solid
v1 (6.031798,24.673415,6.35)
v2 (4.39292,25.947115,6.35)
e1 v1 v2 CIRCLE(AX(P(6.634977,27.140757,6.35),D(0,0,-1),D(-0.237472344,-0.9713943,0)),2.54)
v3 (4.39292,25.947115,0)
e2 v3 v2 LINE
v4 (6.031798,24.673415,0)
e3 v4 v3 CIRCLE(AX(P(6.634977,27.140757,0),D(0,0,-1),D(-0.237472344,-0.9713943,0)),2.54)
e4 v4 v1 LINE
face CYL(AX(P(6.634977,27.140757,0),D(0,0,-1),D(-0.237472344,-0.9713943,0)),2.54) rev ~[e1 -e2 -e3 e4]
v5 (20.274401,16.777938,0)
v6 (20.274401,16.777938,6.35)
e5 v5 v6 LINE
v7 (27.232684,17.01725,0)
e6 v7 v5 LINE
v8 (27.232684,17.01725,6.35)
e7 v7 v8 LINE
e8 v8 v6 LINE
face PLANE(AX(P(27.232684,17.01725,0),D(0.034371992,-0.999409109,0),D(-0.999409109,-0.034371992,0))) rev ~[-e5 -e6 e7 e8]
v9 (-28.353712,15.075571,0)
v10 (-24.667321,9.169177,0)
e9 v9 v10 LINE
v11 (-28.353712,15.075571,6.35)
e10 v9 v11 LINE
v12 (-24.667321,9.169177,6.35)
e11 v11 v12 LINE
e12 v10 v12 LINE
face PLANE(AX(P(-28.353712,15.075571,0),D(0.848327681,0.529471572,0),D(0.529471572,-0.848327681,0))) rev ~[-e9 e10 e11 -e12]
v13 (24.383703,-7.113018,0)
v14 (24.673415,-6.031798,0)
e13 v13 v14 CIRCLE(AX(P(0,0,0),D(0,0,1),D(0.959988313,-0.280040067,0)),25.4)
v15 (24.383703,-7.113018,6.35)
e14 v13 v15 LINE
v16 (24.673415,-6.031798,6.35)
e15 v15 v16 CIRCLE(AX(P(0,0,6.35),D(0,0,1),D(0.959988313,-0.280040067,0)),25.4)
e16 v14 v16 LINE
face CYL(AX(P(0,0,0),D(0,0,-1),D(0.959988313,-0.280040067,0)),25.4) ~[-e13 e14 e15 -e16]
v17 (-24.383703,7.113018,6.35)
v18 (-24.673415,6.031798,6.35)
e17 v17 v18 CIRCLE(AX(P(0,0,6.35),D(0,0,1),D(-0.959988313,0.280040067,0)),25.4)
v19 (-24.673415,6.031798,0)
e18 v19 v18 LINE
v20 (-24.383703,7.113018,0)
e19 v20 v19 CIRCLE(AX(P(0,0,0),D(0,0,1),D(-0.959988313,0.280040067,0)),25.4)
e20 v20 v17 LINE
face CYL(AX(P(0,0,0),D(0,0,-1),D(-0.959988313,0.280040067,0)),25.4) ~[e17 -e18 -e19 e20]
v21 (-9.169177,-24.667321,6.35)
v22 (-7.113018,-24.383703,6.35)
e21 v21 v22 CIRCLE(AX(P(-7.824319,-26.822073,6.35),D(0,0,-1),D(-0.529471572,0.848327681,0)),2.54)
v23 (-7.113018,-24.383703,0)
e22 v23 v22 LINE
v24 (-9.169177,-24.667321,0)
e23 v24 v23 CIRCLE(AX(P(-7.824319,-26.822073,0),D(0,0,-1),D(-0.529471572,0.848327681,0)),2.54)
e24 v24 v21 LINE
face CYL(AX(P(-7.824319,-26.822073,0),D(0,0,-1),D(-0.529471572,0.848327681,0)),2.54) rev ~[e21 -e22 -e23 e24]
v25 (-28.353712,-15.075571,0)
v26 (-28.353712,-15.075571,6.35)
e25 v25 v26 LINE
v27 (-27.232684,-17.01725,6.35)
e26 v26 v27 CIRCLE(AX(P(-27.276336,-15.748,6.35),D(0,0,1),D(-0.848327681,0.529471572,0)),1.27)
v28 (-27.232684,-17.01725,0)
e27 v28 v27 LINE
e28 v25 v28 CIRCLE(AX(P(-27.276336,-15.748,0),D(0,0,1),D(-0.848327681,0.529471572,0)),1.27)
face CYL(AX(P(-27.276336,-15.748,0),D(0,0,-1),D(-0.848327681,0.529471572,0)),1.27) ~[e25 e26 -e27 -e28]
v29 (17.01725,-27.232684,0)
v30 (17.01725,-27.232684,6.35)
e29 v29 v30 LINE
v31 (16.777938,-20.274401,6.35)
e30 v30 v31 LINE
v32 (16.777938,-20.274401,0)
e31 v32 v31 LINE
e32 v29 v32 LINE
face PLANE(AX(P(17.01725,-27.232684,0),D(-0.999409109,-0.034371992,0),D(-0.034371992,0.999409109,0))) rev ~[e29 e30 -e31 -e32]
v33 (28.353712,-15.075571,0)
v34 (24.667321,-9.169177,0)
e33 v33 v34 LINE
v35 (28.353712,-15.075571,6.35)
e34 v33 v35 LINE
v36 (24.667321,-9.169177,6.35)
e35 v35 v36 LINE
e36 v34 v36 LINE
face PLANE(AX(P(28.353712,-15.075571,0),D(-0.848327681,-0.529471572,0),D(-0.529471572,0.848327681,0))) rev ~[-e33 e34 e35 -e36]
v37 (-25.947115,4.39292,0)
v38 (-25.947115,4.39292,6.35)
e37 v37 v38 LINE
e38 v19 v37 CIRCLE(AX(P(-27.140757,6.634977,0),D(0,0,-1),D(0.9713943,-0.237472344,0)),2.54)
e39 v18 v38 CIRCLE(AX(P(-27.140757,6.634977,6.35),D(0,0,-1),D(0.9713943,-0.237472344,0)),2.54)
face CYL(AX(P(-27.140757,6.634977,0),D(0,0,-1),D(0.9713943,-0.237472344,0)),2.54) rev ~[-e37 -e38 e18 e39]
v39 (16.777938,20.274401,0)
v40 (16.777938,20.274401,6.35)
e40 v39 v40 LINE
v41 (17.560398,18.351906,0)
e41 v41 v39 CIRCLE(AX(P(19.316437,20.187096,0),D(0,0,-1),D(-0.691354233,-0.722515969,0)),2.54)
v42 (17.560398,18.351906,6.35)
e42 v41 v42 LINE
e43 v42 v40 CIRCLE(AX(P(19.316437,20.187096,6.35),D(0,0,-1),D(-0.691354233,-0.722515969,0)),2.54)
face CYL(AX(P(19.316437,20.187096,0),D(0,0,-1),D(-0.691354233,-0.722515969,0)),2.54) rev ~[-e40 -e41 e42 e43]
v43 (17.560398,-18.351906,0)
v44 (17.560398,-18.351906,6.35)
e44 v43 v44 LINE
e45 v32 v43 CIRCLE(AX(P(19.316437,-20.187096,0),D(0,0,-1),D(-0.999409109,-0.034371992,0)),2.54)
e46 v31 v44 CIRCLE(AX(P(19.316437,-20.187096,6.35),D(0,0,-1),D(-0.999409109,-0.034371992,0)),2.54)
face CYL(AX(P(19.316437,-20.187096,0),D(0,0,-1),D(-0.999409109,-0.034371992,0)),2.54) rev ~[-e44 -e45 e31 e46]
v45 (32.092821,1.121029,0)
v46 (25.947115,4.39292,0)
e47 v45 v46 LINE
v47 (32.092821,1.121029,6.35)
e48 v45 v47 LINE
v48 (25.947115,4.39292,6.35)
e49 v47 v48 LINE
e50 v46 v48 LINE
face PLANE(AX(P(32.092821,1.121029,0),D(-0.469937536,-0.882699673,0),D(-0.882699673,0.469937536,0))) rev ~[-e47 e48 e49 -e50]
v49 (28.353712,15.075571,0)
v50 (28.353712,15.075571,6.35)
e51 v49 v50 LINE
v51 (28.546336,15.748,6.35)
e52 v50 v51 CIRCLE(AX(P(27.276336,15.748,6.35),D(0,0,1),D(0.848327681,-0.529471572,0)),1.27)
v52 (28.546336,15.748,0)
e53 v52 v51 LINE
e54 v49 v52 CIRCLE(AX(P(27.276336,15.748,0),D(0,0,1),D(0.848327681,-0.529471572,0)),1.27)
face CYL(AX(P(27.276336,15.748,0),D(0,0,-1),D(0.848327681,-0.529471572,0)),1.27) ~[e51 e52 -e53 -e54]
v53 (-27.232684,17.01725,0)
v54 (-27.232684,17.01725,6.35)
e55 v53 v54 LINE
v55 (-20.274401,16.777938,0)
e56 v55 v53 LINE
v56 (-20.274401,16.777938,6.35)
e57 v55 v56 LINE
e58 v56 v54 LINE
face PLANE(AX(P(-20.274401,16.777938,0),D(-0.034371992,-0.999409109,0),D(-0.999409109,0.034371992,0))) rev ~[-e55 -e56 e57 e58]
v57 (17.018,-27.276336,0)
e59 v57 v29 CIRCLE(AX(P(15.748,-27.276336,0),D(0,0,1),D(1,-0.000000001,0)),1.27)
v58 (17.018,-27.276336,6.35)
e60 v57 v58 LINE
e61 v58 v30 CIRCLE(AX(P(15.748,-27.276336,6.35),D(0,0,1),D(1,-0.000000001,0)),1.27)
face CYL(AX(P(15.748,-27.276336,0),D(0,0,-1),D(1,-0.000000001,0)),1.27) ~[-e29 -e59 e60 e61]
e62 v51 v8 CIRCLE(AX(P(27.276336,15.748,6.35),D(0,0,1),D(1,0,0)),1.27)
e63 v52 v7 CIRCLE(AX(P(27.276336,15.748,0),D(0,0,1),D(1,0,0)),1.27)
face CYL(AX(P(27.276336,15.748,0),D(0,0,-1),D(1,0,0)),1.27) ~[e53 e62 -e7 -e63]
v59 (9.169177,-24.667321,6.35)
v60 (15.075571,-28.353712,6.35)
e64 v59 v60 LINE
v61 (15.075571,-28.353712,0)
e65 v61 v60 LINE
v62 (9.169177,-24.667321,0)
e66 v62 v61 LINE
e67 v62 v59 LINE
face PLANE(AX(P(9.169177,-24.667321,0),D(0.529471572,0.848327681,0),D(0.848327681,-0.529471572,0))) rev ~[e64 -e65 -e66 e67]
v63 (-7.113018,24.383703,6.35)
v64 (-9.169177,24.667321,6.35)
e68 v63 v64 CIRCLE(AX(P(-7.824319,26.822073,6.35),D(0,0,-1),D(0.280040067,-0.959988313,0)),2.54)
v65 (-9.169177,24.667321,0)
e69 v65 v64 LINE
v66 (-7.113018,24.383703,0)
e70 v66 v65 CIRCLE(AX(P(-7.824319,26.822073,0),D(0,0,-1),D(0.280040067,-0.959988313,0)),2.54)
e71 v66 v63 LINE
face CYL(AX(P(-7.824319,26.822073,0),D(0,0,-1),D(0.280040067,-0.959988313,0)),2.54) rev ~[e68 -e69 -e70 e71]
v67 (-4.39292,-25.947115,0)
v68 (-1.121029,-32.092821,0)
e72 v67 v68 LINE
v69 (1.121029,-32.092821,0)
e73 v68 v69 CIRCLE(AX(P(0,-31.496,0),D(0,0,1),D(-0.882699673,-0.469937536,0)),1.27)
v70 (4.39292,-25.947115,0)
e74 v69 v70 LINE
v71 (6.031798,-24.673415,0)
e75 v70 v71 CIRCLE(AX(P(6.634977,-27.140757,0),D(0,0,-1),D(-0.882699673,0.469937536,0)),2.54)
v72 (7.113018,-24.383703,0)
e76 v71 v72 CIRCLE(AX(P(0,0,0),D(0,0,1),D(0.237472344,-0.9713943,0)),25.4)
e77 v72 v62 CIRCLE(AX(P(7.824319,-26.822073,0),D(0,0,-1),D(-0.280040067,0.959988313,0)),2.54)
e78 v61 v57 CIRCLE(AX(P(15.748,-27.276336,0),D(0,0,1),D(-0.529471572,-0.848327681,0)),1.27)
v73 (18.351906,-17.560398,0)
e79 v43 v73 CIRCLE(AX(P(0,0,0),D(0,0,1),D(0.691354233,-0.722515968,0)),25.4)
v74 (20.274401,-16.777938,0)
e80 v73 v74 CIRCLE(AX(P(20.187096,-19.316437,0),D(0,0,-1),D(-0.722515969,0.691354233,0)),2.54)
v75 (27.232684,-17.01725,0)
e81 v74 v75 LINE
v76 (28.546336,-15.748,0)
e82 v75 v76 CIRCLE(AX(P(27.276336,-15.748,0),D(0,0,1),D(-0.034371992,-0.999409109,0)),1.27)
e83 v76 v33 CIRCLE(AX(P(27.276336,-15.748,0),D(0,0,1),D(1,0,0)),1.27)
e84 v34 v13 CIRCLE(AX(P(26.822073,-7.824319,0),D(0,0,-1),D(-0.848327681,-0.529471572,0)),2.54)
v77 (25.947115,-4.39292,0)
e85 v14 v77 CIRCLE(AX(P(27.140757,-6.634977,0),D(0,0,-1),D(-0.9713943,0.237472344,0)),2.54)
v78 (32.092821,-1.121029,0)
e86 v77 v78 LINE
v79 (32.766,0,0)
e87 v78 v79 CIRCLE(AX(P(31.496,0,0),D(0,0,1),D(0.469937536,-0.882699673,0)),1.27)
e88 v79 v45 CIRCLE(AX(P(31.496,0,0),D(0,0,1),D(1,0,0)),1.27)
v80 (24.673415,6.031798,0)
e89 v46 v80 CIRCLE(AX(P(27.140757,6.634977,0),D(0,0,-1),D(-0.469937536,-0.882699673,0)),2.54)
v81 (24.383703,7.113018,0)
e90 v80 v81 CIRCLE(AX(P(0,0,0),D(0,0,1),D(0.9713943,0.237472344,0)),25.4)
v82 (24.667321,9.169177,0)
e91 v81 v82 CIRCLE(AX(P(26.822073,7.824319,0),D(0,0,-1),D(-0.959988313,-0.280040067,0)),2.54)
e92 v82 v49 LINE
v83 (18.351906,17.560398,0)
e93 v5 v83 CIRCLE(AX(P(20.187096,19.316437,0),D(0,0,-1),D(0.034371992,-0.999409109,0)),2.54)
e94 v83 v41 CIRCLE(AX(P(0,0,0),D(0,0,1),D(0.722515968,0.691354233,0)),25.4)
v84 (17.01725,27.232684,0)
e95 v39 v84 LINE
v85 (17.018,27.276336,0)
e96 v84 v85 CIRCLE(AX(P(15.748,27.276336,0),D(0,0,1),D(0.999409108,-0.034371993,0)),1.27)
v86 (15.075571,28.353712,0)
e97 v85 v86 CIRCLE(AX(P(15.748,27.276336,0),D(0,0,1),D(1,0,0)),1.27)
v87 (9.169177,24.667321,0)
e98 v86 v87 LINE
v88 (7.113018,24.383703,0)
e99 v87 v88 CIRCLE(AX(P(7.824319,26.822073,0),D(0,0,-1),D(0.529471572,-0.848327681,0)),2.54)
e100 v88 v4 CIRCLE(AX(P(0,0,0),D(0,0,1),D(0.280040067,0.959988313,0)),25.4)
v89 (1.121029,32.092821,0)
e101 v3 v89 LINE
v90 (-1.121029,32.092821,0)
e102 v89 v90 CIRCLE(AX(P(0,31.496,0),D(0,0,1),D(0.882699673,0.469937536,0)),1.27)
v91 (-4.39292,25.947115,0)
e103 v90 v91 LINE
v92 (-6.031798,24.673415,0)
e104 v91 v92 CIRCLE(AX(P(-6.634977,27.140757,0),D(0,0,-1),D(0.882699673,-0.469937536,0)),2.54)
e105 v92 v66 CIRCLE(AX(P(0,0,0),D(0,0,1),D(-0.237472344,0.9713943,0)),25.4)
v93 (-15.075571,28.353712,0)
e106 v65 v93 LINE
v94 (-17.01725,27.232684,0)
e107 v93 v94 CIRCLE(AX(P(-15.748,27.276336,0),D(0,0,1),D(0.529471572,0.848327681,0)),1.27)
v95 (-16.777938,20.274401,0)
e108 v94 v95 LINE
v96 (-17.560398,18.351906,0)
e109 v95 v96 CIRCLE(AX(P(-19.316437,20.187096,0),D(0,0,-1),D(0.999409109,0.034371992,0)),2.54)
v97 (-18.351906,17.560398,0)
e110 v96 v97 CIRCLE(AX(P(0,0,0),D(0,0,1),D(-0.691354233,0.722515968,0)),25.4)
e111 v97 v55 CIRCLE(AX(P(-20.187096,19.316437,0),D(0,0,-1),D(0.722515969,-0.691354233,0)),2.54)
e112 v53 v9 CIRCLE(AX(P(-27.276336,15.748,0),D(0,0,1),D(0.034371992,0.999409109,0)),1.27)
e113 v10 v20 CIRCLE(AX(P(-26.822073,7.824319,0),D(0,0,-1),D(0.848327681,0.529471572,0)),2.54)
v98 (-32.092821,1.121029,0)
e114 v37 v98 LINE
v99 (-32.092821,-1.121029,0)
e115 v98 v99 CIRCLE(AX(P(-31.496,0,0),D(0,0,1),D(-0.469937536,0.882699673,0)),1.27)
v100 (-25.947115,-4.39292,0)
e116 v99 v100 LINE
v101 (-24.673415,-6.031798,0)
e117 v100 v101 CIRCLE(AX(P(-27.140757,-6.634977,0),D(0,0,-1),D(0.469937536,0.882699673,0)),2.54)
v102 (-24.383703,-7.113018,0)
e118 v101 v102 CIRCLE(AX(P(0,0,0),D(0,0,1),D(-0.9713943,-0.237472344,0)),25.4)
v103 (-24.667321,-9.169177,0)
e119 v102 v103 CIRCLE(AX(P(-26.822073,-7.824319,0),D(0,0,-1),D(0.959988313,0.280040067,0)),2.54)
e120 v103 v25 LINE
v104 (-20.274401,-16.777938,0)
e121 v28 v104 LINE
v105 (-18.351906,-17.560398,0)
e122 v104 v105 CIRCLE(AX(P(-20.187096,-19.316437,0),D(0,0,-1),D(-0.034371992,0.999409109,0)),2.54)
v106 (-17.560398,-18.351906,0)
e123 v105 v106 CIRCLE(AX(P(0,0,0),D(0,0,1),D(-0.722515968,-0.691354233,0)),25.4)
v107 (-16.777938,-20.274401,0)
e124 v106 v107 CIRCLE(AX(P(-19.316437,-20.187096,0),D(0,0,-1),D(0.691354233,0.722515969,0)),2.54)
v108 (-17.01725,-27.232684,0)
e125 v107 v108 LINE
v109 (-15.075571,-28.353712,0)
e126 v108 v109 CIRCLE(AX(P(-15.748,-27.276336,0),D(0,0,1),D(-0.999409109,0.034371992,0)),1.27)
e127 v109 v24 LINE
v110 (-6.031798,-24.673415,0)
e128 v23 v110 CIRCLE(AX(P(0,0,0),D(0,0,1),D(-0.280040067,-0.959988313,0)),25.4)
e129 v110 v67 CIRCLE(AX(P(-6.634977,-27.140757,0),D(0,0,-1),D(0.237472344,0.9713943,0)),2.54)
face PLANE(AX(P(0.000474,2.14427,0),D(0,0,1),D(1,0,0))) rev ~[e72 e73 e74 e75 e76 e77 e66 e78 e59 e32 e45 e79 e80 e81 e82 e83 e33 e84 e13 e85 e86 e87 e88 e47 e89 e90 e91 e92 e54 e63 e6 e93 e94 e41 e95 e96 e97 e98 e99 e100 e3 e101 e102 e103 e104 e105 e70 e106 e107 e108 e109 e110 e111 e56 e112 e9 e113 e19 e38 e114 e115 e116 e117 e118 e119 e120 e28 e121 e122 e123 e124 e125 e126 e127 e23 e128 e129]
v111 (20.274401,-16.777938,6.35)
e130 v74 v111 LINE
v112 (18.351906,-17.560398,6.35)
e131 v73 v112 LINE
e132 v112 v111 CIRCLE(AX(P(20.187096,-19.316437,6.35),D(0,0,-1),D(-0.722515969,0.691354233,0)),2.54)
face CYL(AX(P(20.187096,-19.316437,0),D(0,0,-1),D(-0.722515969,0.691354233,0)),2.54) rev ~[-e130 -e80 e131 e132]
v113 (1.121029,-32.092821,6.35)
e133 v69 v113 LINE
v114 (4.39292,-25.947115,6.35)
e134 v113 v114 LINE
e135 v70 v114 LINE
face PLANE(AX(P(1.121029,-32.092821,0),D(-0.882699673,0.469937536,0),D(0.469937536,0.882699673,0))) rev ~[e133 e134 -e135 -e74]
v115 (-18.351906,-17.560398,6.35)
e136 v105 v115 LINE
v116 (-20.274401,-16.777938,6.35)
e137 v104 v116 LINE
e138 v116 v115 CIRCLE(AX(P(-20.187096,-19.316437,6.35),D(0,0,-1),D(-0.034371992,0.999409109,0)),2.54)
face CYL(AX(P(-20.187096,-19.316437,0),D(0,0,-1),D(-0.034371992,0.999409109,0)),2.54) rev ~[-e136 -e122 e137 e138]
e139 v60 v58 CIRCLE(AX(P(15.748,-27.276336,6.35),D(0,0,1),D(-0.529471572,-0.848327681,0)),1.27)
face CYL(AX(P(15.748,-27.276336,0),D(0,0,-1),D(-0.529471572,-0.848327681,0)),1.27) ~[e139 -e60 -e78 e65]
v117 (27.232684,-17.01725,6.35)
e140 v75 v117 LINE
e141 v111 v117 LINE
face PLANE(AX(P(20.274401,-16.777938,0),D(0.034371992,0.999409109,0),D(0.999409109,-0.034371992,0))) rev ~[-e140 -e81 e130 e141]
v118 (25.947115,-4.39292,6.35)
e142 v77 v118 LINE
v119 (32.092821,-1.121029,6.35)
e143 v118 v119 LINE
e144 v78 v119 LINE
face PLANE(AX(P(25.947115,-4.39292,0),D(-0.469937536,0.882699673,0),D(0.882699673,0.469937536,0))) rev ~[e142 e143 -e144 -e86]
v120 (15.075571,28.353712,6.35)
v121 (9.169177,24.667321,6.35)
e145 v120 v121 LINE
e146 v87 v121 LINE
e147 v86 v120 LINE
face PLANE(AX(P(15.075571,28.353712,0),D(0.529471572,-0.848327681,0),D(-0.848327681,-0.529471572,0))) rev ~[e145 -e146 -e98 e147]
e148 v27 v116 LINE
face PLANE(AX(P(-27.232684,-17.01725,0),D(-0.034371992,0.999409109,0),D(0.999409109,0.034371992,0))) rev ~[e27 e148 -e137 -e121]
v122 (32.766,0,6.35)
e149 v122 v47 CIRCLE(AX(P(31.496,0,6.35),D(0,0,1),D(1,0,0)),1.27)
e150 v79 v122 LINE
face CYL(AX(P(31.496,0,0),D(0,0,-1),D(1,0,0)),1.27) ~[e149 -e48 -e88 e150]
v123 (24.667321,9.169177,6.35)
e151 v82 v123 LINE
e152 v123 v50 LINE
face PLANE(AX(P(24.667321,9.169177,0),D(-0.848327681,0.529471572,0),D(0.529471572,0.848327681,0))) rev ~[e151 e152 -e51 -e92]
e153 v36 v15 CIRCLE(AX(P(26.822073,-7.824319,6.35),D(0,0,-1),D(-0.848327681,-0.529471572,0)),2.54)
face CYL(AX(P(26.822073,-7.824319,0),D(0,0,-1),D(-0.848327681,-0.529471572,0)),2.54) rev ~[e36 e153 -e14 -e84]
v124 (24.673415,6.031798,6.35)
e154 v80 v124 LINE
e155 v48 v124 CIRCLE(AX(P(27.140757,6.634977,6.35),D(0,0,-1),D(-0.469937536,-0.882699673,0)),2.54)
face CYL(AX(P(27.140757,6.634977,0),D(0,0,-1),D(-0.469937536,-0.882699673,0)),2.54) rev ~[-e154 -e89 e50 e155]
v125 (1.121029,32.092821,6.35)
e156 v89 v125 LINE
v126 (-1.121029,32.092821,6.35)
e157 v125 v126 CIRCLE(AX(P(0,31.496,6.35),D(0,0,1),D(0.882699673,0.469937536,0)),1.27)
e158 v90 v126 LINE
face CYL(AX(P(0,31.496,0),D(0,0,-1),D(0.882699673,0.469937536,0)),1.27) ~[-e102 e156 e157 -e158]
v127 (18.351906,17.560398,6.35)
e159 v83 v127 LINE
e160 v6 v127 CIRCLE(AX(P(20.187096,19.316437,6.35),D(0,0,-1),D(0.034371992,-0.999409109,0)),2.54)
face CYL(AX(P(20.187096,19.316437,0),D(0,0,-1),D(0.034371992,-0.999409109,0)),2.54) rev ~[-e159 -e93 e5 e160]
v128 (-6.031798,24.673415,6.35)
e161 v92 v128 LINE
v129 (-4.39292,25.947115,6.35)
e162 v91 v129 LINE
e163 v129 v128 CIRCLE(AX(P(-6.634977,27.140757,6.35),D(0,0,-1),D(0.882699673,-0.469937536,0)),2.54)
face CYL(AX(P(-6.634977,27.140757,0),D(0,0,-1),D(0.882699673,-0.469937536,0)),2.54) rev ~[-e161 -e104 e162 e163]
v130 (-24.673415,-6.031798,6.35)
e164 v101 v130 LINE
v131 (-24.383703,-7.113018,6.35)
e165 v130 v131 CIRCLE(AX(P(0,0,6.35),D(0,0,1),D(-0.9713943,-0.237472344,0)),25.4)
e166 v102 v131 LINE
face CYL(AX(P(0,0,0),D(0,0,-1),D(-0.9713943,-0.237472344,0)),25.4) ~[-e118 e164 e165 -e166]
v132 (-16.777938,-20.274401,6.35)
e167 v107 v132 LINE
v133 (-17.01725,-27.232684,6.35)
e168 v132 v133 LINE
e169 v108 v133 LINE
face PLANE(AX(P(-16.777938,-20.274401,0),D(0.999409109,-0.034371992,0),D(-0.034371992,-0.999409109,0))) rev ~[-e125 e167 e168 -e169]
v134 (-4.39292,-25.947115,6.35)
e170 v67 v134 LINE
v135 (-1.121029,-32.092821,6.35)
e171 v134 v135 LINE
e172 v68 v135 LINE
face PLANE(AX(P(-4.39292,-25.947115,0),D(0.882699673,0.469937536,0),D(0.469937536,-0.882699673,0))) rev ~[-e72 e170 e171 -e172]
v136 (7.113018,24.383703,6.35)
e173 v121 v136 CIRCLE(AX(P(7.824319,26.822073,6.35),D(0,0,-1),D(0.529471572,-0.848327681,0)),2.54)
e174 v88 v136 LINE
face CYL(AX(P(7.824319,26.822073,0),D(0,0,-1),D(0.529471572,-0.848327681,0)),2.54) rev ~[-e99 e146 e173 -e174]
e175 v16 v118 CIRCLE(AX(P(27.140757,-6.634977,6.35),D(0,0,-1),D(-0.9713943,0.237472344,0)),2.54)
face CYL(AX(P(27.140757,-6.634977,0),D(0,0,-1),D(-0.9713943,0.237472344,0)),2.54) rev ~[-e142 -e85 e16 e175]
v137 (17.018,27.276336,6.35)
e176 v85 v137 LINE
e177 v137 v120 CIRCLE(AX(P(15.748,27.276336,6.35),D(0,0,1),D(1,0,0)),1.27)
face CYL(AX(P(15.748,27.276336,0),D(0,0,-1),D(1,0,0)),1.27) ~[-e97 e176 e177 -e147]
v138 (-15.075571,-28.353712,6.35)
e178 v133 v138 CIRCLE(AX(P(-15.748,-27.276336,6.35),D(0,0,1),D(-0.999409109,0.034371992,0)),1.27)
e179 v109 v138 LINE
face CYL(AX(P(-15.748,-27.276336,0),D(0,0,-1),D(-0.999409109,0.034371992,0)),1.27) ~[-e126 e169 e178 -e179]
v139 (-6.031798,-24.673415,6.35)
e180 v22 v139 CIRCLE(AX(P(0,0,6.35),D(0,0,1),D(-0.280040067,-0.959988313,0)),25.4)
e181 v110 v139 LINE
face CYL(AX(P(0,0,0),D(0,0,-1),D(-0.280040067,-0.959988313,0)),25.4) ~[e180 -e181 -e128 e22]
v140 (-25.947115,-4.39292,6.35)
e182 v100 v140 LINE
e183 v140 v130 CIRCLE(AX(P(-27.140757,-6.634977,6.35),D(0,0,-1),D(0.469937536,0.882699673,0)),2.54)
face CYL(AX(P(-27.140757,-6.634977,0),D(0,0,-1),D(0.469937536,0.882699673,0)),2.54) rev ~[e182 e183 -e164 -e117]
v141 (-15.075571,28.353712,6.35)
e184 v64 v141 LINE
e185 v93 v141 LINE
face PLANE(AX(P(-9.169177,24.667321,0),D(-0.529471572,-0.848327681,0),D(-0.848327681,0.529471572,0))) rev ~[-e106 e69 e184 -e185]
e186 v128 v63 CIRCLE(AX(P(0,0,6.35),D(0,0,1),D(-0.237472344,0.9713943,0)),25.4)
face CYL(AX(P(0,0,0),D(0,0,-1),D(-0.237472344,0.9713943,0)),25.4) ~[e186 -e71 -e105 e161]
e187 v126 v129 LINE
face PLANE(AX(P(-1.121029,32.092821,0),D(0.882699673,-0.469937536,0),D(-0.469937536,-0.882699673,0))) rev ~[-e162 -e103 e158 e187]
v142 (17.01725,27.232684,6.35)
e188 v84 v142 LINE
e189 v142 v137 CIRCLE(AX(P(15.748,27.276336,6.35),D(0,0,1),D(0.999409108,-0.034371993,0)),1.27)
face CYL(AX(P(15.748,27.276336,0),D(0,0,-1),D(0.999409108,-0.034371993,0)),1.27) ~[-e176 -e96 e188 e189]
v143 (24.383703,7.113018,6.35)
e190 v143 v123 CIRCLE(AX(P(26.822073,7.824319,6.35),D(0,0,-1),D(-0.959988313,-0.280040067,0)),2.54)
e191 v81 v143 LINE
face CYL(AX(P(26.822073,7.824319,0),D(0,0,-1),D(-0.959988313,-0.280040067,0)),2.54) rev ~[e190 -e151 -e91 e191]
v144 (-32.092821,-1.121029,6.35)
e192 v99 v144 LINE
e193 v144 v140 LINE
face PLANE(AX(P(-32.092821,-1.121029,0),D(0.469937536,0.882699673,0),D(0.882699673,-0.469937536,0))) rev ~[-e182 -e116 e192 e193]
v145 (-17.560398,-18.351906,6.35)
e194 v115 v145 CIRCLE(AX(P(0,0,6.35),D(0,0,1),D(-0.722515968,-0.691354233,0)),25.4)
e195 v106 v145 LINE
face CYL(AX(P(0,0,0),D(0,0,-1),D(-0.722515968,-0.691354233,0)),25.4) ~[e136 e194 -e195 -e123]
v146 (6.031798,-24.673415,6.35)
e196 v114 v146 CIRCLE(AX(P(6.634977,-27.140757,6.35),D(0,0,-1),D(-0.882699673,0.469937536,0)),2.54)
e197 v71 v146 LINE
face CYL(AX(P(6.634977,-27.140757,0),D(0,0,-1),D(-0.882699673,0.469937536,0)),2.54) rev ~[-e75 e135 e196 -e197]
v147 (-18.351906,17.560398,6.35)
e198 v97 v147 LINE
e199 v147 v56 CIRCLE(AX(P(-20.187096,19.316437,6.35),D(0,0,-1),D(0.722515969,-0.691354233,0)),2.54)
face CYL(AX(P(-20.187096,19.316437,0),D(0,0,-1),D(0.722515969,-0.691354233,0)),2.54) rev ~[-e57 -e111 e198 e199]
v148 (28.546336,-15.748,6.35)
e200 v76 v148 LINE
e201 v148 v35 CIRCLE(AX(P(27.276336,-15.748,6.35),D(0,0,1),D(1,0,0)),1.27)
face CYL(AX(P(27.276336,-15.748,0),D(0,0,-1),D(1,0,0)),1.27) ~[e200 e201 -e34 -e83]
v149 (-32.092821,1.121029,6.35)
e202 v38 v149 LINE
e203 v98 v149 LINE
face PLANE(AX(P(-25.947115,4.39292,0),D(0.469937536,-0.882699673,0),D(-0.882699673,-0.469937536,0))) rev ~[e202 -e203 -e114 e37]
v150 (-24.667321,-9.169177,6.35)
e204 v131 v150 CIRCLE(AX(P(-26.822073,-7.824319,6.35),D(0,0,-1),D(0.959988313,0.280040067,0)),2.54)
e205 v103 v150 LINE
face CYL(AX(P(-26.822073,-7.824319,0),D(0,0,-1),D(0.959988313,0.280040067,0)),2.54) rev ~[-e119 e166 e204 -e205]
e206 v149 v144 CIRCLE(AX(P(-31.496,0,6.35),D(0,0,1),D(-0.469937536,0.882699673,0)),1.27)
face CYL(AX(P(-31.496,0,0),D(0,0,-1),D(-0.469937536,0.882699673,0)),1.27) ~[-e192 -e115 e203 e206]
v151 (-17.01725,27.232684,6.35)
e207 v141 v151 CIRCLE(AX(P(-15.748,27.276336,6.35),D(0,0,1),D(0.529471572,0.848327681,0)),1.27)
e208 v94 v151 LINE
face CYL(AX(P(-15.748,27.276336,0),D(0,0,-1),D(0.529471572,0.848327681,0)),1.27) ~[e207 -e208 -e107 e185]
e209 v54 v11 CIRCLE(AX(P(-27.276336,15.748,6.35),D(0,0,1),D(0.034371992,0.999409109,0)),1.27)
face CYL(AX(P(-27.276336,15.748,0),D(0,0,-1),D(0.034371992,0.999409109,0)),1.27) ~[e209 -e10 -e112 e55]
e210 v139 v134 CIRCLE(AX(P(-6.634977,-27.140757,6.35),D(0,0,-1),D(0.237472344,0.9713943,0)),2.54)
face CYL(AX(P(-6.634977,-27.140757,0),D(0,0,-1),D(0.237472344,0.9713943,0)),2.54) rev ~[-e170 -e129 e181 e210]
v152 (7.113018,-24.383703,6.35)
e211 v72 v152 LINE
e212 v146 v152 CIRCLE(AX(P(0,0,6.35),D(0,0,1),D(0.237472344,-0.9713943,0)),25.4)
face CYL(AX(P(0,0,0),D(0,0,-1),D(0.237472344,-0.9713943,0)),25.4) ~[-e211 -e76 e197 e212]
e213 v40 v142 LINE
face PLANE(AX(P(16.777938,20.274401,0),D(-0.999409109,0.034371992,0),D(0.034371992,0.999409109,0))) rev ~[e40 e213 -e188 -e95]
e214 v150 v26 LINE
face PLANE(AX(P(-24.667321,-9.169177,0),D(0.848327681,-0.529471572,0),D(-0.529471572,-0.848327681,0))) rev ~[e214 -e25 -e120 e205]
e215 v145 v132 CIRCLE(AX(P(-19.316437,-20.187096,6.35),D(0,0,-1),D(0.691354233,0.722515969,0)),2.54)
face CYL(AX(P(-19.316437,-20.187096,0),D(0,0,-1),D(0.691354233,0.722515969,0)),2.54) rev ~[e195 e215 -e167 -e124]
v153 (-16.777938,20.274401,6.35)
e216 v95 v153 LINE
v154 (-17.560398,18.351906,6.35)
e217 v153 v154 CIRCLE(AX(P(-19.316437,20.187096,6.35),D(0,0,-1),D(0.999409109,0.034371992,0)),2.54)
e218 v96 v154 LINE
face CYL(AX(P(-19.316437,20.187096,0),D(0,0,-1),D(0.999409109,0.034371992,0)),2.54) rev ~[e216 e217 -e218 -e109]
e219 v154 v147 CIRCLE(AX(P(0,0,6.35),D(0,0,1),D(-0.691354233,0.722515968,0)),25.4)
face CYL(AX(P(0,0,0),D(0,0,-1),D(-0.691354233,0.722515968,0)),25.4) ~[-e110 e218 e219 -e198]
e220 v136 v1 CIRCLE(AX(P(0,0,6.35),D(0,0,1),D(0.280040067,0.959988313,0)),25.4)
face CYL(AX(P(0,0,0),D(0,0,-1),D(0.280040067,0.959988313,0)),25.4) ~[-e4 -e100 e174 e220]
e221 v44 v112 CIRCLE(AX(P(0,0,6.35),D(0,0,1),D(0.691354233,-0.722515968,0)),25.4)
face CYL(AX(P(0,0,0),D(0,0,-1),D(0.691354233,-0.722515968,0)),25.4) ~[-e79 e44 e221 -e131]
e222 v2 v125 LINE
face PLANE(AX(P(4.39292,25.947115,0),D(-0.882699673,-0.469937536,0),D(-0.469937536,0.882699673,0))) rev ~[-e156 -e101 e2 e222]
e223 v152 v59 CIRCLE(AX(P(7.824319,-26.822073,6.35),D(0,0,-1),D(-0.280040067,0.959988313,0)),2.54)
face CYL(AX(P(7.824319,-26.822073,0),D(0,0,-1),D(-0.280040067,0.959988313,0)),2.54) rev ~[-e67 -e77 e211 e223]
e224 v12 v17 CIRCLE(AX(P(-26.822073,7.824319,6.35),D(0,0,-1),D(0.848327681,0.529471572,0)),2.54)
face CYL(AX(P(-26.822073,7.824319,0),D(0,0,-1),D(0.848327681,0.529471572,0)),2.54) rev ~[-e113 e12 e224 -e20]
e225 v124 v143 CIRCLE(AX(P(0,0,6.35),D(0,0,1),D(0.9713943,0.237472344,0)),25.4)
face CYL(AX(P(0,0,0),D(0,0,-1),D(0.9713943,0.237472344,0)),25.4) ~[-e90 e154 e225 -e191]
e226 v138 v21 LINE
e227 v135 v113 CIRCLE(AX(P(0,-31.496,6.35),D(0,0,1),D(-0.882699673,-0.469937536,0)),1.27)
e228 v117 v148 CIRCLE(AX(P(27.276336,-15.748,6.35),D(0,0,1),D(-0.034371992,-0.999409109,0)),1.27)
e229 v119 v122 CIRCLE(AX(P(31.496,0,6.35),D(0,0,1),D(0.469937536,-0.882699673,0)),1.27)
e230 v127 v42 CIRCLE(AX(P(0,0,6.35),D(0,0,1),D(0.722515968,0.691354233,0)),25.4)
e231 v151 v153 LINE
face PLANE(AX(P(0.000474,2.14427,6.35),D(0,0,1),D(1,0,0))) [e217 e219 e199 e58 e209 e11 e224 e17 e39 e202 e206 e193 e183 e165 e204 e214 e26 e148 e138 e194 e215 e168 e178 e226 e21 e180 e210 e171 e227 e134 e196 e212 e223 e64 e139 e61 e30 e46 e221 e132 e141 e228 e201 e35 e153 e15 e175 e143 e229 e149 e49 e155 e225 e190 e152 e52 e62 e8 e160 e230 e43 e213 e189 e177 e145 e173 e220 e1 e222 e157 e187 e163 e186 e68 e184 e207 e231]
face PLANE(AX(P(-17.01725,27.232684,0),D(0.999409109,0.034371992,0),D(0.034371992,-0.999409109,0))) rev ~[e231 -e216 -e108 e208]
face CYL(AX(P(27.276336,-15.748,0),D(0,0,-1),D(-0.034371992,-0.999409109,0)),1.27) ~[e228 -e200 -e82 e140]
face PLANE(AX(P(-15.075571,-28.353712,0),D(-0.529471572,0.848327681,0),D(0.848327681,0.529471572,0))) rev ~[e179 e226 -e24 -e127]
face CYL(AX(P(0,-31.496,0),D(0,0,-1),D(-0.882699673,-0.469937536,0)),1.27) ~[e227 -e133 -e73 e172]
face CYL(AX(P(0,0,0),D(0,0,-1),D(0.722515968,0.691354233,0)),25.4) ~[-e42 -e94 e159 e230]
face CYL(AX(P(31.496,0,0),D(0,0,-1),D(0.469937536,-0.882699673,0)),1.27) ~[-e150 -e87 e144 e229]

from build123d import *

# Parameters (mm, degrees)
F1_DEPTH = 6.35


with BuildPart() as f1:
    # F0 (on Top) → F1 (new body)
    with BuildSketch(Plane.XY):
        with BuildLine():
            ThreePointArc((-4.39292013, 25.9471153947), (-5.0763171932, 25.1352197323), (-6.031797544, 24.6734152153))
            ThreePointArc((-6.031797544, 24.6734152153), (-6.5740037456, 24.5345159877), (-7.1130177041, 24.3837031466))
            ThreePointArc((-7.1130177041, 24.3837031466), (-12.7, 21.9970452561), (-17.5603975113, 18.3519056026))
            ThreePointArc((-17.5603975113, 18.3519056026), (-17.9605122421, 17.9605122421), (-18.3519056026, 17.5603975113))
            ThreePointArc((-18.3519056026, 17.5603975113), (-21.9970452561, 12.7), (-24.3837031466, 7.1130177041))
            ThreePointArc((-24.3837031466, 7.1130177041), (-24.5345159877, 6.5740037456), (-24.6734152153, 6.031797544))
            ThreePointArc((-24.6734152153, 6.031797544), (-25.4, 0), (-24.6734152153, -6.031797544))
            ThreePointArc((-24.6734152153, -6.031797544), (-24.5345159877, -6.5740037456), (-24.3837031466, -7.1130177041))
            ThreePointArc((-24.3837031466, -7.1130177041), (-21.9970452561, -12.7), (-18.3519056026, -17.5603975113))
            ThreePointArc((-18.3519056026, -17.5603975113), (-17.9605122421, -17.9605122421), (-17.5603975113, -18.3519056026))
            ThreePointArc((-17.5603975113, -18.3519056026), (-12.7, -21.9970452561), (-7.1130177041, -24.3837031466))
            ThreePointArc((-7.1130177041, -24.3837031466), (-6.5740037456, -24.5345159877), (-6.031797544, -24.6734152153))
            ThreePointArc((-6.031797544, -24.6734152153), (0, -25.4), (6.031797544, -24.6734152153))
            ThreePointArc((6.031797544, -24.6734152153), (6.5740037456, -24.5345159877), (7.1130177041, -24.3837031466))
            ThreePointArc((7.1130177041, -24.3837031466), (12.7, -21.9970452561), (17.5603975113, -18.3519056026))
            ThreePointArc((17.5603975113, -18.3519056026), (17.9605122421, -17.9605122421), (18.3519056026, -17.5603975113))
            ThreePointArc((18.3519056026, -17.5603975113), (21.9970452561, -12.7), (24.3837031466, -7.1130177041))
            ThreePointArc((24.3837031466, -7.1130177041), (24.5345159877, -6.5740037456), (24.6734152153, -6.031797544))
            ThreePointArc((24.6734152153, -6.031797544), (25.4, 0), (24.6734152153, 6.031797544))
            ThreePointArc((24.6734152153, 6.031797544), (24.5345159877, 6.5740037456), (24.3837031466, 7.1130177041))
            ThreePointArc((24.3837031466, 7.1130177041), (21.9970452561, 12.7), (18.3519056026, 17.5603975113))
            ThreePointArc((18.3519056026, 17.5603975113), (17.9605122421, 17.9605122421), (17.5603975113, 18.3519056026))
            ThreePointArc((17.5603975113, 18.3519056026), (12.7, 21.9970452561), (7.1130177041, 24.3837031466))
            ThreePointArc((7.1130177041, 24.3837031466), (6.5740037456, 24.5345159877), (6.031797544, 24.6734152153))
            ThreePointArc((6.031797544, 24.6734152153), (5.0763171932, 25.1352197323), (4.39292013, 25.9471153947))
            Line((4.39292013, 25.9471153947), (1.1210285842, 32.0928206711))
            ThreePointArc((1.1210285842, 32.0928206711), (1.2321944453, 31.8035660076), (1.27, 31.496))
            ThreePointArc((1.27, 31.496), (0.8980256121, 30.5979743879), (0, 30.226))
            ThreePointArc((0, 30.226), (-1.0887750576, 30.8421889616), (-1.1210285842, 32.0928206711))
            Line((-1.1210285842, 32.0928206711), (-4.39292013, 25.9471153947))
        make_face()
        with BuildLine():
            ThreePointArc((-17.5603975113, 18.3519056026), (-12.7, 21.9970452561), (-7.1130177041, 24.3837031466))
            ThreePointArc((-7.1130177041, 24.3837031466), (-8.1713902192, 24.3058974145), (-9.169177268, 24.6673211518))
            Line((-9.169177268, 24.6673211518), (-15.0755711033, 28.3537122723))
            ThreePointArc((-15.0755711033, 28.3537122723), (-14.6373955027, 27.8923374573), (-14.478, 27.2763361176))
            ThreePointArc((-14.478, 27.2763361176), (-15.7261705603, 26.0065237395), (-17.0172495678, 27.2326836881))
            Line((-17.0172495678, 27.2326836881), (-16.7779381267, 20.2744010218))
            ThreePointArc((-16.7779381267, 20.2744010218), (-16.9638295132, 19.2295802213), (-17.5603975113, 18.3519056026))
        make_face()
        with BuildLine():
            ThreePointArc((1.1210285842, 32.0928206711), (0, 32.766), (-1.1210285842, 32.0928206711))
            ThreePointArc((-1.1210285842, 32.0928206711), (-1.0887750576, 30.8421889616), (0, 30.226))
            ThreePointArc((0, 30.226), (0.8980256121, 30.5979743879), (1.27, 31.496))
            ThreePointArc((1.27, 31.496), (1.2321944453, 31.8035660076), (1.1210285842, 32.0928206711))
        make_face()
        with BuildLine():
            ThreePointArc((-24.3837031466, 7.1130177041), (-21.9970452561, 12.7), (-18.3519056026, 17.5603975113))
            ThreePointArc((-18.3519056026, 17.5603975113), (-19.2295802213, 16.9638295132), (-20.2744010218, 16.7779381267))
            Line((-20.2744010218, 16.7779381267), (-27.2326836881, 17.0172495678))
            ThreePointArc((-27.2326836881, 17.0172495678), (-26.3630074294, 16.6304571986), (-26.0063361176, 15.748))
            ThreePointArc((-26.0063361176, 15.748), (-26.9265988709, 14.5271053042), (-28.3537122723, 15.0755711033))
            Line((-28.3537122723, 15.0755711033), (-24.6673211518, 9.169177268))
            ThreePointArc((-24.6673211518, 9.169177268), (-24.3058974145, 8.1713902192), (-24.3837031466, 7.1130177041))
        make_face()
        with BuildLine():
            ThreePointArc((-14.478, 27.2763361176), (-14.6373955027, 27.8923374573), (-15.0755711033, 28.3537122723))
            ThreePointArc((-15.0755711033, 28.3537122723), (-16.383, 28.3761883804), (-17.0172495678, 27.2326836881))
            ThreePointArc((-17.0172495678, 27.2326836881), (-15.7261705603, 26.0065237395), (-14.478, 27.2763361176))
        make_face()
        with BuildLine():
            ThreePointArc((-24.6734152153, -6.031797544), (-25.4, 0), (-24.6734152153, 6.031797544))
            ThreePointArc((-24.6734152153, 6.031797544), (-25.1352197323, 5.0763171932), (-25.9471153947, 4.39292013))
            Line((-25.9471153947, 4.39292013), (-32.0928206711, 1.1210285842))
            ThreePointArc((-32.0928206711, 1.1210285842), (-30.8421889616, 1.0887750576), (-30.226, 0))
            ThreePointArc((-30.226, 0), (-30.8421889616, -1.0887750576), (-32.0928206711, -1.1210285842))
            Line((-32.0928206711, -1.1210285842), (-25.9471153947, -4.39292013))
            ThreePointArc((-25.9471153947, -4.39292013), (-25.1352197323, -5.0763171932), (-24.6734152153, -6.031797544))
        make_face()
        with BuildLine():
            ThreePointArc((-26.0063361176, 15.748), (-26.3630074294, 16.6304571986), (-27.2326836881, 17.0172495678))
            ThreePointArc((-27.2326836881, 17.0172495678), (-28.3761883804, 16.383), (-28.3537122723, 15.0755711033))
            ThreePointArc((-28.3537122723, 15.0755711033), (-26.9265988709, 14.5271053042), (-26.0063361176, 15.748))
        make_face()
        with BuildLine():
            ThreePointArc((9.169177268, 24.6673211518), (8.1713902192, 24.3058974145), (7.1130177041, 24.3837031466))
            ThreePointArc((7.1130177041, 24.3837031466), (12.7, 21.9970452561), (17.5603975113, 18.3519056026))
            ThreePointArc((17.5603975113, 18.3519056026), (16.9638295132, 19.2295802213), (16.7779381267, 20.2744010218))
            Line((16.7779381267, 20.2744010218), (17.0172495678, 27.2326836881))
            ThreePointArc((17.0172495678, 27.2326836881), (15.113, 26.1764838548), (15.0755711033, 28.3537122723))
            Line((15.0755711033, 28.3537122723), (9.169177268, 24.6673211518))
        make_face()
        with BuildLine():
            ThreePointArc((-18.3519056026, -17.5603975113), (-21.9970452561, -12.7), (-24.3837031466, -7.1130177041))
            ThreePointArc((-24.3837031466, -7.1130177041), (-24.3058974145, -8.1713902192), (-24.6673211518, -9.169177268))
            Line((-24.6673211518, -9.169177268), (-28.3537122723, -15.0755711033))
            ThreePointArc((-28.3537122723, -15.0755711033), (-26.9265988709, -14.5271053042), (-26.0063361176, -15.748))
            ThreePointArc((-26.0063361176, -15.748), (-26.3630074294, -16.6304571986), (-27.2326836881, -17.0172495678))
            Line((-27.2326836881, -17.0172495678), (-20.2744010218, -16.7779381267))
            ThreePointArc((-20.2744010218, -16.7779381267), (-19.2295802213, -16.9638295132), (-18.3519056026, -17.5603975113))
        make_face()
        with BuildLine():
            ThreePointArc((-30.226, 0), (-30.8421889616, 1.0887750576), (-32.0928206711, 1.1210285842))
            ThreePointArc((-32.0928206711, 1.1210285842), (-32.766, 0), (-32.0928206711, -1.1210285842))
            ThreePointArc((-32.0928206711, -1.1210285842), (-30.8421889616, -1.0887750576), (-30.226, 0))
        make_face()
        with BuildLine():
            ThreePointArc((20.2744010218, 16.7779381267), (19.2295802213, 16.9638295132), (18.3519056026, 17.5603975113))
            ThreePointArc((18.3519056026, 17.5603975113), (21.9970452561, 12.7), (24.3837031466, 7.1130177041))
            ThreePointArc((24.3837031466, 7.1130177041), (24.3058974145, 8.1713902192), (24.6673211518, 9.169177268))
            Line((24.6673211518, 9.169177268), (28.3537122723, 15.0755711033))
            ThreePointArc((28.3537122723, 15.0755711033), (26.1764838548, 15.113), (27.2326836881, 17.0172495678))
            Line((27.2326836881, 17.0172495678), (20.2744010218, 16.7779381267))
        make_face()
        with BuildLine():
            ThreePointArc((17.018, 27.2763361176), (16.3640013397, 28.3869406149), (15.0755711033, 28.3537122723))
            ThreePointArc((15.0755711033, 28.3537122723), (15.113, 26.1764838548), (17.0172495678, 27.2326836881))
            ThreePointArc((17.0172495678, 27.2326836881), (17.0178123781, 27.2545066779), (17.018, 27.2763361176))
        make_face()
        with BuildLine():
            ThreePointArc((-7.1130177041, -24.3837031466), (-12.7, -21.9970452561), (-17.5603975113, -18.3519056026))
            ThreePointArc((-17.5603975113, -18.3519056026), (-16.9638295132, -19.2295802213), (-16.7779381267, -20.2744010218))
            Line((-16.7779381267, -20.2744010218), (-17.0172495678, -27.2326836881))
            ThreePointArc((-17.0172495678, -27.2326836881), (-15.7261705603, -26.0065237395), (-14.478, -27.2763361176))
            ThreePointArc((-14.478, -27.2763361176), (-14.6373955027, -27.8923374573), (-15.0755711033, -28.3537122723))
            Line((-15.0755711033, -28.3537122723), (-9.169177268, -24.6673211518))
            ThreePointArc((-9.169177268, -24.6673211518), (-8.1713902192, -24.3058974145), (-7.1130177041, -24.3837031466))
        make_face()
        with BuildLine():
            ThreePointArc((-26.0063361176, -15.748), (-26.9265988709, -14.5271053042), (-28.3537122723, -15.0755711033))
            ThreePointArc((-28.3537122723, -15.0755711033), (-28.3761883804, -16.383), (-27.2326836881, -17.0172495678))
            ThreePointArc((-27.2326836881, -17.0172495678), (-26.3630074294, -16.6304571986), (-26.0063361176, -15.748))
        make_face()
        with BuildLine():
            ThreePointArc((25.9471153947, 4.39292013), (25.1352197323, 5.0763171932), (24.6734152153, 6.031797544))
            ThreePointArc((24.6734152153, 6.031797544), (25.4, 0), (24.6734152153, -6.031797544))
            ThreePointArc((24.6734152153, -6.031797544), (25.1352197323, -5.0763171932), (25.9471153947, -4.39292013))
            Line((25.9471153947, -4.39292013), (32.0928206711, -1.1210285842))
            ThreePointArc((32.0928206711, -1.1210285842), (30.226, 0), (32.0928206711, 1.1210285842))
            Line((32.0928206711, 1.1210285842), (25.9471153947, 4.39292013))
        make_face()
        with BuildLine():
            ThreePointArc((28.5463361176, 15.748), (28.1587933162, 16.6613286882), (27.2326836881, 17.0172495678))
            ThreePointArc((27.2326836881, 17.0172495678), (26.1764838548, 15.113), (28.3537122723, 15.0755711033))
            ThreePointArc((28.3537122723, 15.0755711033), (28.4972308134, 15.3982627533), (28.5463361176, 15.748))
        make_face()
        with BuildLine():
            ThreePointArc((6.031797544, -24.6734152153), (0, -25.4), (-6.031797544, -24.6734152153))
            ThreePointArc((-6.031797544, -24.6734152153), (-5.0763171932, -25.1352197323), (-4.39292013, -25.9471153947))
            Line((-4.39292013, -25.9471153947), (-1.1210285842, -32.0928206711))
            ThreePointArc((-1.1210285842, -32.0928206711), (-0.3075660076, -30.2638055547), (1.27, -31.496))
            ThreePointArc((1.27, -31.496), (1.2321944453, -31.8035660076), (1.1210285842, -32.0928206711))
            Line((1.1210285842, -32.0928206711), (4.39292013, -25.9471153947))
            ThreePointArc((4.39292013, -25.9471153947), (5.0763171932, -25.1352197323), (6.031797544, -24.6734152153))
        make_face()
        with BuildLine():
            ThreePointArc((-14.478, -27.2763361176), (-15.7261705603, -26.0065237395), (-17.0172495678, -27.2326836881))
            ThreePointArc((-17.0172495678, -27.2326836881), (-16.383, -28.3761883804), (-15.0755711033, -28.3537122723))
            ThreePointArc((-15.0755711033, -28.3537122723), (-14.6373955027, -27.8923374573), (-14.478, -27.2763361176))
        make_face()
        with BuildLine():
            ThreePointArc((24.6673211518, -9.169177268), (24.3058974145, -8.1713902192), (24.3837031466, -7.1130177041))
            ThreePointArc((24.3837031466, -7.1130177041), (21.9970452561, -12.7), (18.3519056026, -17.5603975113))
            ThreePointArc((18.3519056026, -17.5603975113), (19.2295802213, -16.9638295132), (20.2744010218, -16.7779381267))
            Line((20.2744010218, -16.7779381267), (27.2326836881, -17.0172495678))
            ThreePointArc((27.2326836881, -17.0172495678), (26.1764838548, -15.113), (28.3537122723, -15.0755711033))
            Line((28.3537122723, -15.0755711033), (24.6673211518, -9.169177268))
        make_face()
        with BuildLine():
            ThreePointArc((32.766, 0), (32.5847750576, 0.6538110384), (32.0928206711, 1.1210285842))
            ThreePointArc((32.0928206711, 1.1210285842), (30.226, 0), (32.0928206711, -1.1210285842))
            ThreePointArc((32.0928206711, -1.1210285842), (32.5847750576, -0.6538110384), (32.766, 0))
        make_face()
        with BuildLine():
            ThreePointArc((17.5603975113, -18.3519056026), (12.7, -21.9970452561), (7.1130177041, -24.3837031466))
            ThreePointArc((7.1130177041, -24.3837031466), (8.1713902192, -24.3058974145), (9.169177268, -24.6673211518))
            Line((9.169177268, -24.6673211518), (15.0755711033, -28.3537122723))
            ThreePointArc((15.0755711033, -28.3537122723), (15.113, -26.1764838548), (17.0172495678, -27.2326836881))
            Line((17.0172495678, -27.2326836881), (16.7779381267, -20.2744010218))
            ThreePointArc((16.7779381267, -20.2744010218), (16.9638295132, -19.2295802213), (17.5603975113, -18.3519056026))
        make_face()
        with BuildLine():
            ThreePointArc((1.27, -31.496), (-0.3075660076, -30.2638055547), (-1.1210285842, -32.0928206711))
            ThreePointArc((-1.1210285842, -32.0928206711), (0, -32.766), (1.1210285842, -32.0928206711))
            ThreePointArc((1.1210285842, -32.0928206711), (1.2321944453, -31.8035660076), (1.27, -31.496))
        make_face()
        with BuildLine():
            ThreePointArc((28.5463361176, -15.748), (28.4972308134, -15.3982627533), (28.3537122723, -15.0755711033))
            ThreePointArc((28.3537122723, -15.0755711033), (26.1764838548, -15.113), (27.2326836881, -17.0172495678))
            ThreePointArc((27.2326836881, -17.0172495678), (28.1587933162, -16.6613286882), (28.5463361176, -15.748))
        make_face()
        with BuildLine():
            ThreePointArc((17.0172495678, -27.2326836881), (15.113, -26.1764838548), (15.0755711033, -28.3537122723))
            ThreePointArc((15.0755711033, -28.3537122723), (16.3640013397, -28.3869406149), (17.018, -27.2763361176))
            ThreePointArc((17.018, -27.2763361176), (17.0178123781, -27.2545066779), (17.0172495678, -27.2326836881))
        make_face()
    extrude(amount=F1_DEPTH)


solid = f1.part
